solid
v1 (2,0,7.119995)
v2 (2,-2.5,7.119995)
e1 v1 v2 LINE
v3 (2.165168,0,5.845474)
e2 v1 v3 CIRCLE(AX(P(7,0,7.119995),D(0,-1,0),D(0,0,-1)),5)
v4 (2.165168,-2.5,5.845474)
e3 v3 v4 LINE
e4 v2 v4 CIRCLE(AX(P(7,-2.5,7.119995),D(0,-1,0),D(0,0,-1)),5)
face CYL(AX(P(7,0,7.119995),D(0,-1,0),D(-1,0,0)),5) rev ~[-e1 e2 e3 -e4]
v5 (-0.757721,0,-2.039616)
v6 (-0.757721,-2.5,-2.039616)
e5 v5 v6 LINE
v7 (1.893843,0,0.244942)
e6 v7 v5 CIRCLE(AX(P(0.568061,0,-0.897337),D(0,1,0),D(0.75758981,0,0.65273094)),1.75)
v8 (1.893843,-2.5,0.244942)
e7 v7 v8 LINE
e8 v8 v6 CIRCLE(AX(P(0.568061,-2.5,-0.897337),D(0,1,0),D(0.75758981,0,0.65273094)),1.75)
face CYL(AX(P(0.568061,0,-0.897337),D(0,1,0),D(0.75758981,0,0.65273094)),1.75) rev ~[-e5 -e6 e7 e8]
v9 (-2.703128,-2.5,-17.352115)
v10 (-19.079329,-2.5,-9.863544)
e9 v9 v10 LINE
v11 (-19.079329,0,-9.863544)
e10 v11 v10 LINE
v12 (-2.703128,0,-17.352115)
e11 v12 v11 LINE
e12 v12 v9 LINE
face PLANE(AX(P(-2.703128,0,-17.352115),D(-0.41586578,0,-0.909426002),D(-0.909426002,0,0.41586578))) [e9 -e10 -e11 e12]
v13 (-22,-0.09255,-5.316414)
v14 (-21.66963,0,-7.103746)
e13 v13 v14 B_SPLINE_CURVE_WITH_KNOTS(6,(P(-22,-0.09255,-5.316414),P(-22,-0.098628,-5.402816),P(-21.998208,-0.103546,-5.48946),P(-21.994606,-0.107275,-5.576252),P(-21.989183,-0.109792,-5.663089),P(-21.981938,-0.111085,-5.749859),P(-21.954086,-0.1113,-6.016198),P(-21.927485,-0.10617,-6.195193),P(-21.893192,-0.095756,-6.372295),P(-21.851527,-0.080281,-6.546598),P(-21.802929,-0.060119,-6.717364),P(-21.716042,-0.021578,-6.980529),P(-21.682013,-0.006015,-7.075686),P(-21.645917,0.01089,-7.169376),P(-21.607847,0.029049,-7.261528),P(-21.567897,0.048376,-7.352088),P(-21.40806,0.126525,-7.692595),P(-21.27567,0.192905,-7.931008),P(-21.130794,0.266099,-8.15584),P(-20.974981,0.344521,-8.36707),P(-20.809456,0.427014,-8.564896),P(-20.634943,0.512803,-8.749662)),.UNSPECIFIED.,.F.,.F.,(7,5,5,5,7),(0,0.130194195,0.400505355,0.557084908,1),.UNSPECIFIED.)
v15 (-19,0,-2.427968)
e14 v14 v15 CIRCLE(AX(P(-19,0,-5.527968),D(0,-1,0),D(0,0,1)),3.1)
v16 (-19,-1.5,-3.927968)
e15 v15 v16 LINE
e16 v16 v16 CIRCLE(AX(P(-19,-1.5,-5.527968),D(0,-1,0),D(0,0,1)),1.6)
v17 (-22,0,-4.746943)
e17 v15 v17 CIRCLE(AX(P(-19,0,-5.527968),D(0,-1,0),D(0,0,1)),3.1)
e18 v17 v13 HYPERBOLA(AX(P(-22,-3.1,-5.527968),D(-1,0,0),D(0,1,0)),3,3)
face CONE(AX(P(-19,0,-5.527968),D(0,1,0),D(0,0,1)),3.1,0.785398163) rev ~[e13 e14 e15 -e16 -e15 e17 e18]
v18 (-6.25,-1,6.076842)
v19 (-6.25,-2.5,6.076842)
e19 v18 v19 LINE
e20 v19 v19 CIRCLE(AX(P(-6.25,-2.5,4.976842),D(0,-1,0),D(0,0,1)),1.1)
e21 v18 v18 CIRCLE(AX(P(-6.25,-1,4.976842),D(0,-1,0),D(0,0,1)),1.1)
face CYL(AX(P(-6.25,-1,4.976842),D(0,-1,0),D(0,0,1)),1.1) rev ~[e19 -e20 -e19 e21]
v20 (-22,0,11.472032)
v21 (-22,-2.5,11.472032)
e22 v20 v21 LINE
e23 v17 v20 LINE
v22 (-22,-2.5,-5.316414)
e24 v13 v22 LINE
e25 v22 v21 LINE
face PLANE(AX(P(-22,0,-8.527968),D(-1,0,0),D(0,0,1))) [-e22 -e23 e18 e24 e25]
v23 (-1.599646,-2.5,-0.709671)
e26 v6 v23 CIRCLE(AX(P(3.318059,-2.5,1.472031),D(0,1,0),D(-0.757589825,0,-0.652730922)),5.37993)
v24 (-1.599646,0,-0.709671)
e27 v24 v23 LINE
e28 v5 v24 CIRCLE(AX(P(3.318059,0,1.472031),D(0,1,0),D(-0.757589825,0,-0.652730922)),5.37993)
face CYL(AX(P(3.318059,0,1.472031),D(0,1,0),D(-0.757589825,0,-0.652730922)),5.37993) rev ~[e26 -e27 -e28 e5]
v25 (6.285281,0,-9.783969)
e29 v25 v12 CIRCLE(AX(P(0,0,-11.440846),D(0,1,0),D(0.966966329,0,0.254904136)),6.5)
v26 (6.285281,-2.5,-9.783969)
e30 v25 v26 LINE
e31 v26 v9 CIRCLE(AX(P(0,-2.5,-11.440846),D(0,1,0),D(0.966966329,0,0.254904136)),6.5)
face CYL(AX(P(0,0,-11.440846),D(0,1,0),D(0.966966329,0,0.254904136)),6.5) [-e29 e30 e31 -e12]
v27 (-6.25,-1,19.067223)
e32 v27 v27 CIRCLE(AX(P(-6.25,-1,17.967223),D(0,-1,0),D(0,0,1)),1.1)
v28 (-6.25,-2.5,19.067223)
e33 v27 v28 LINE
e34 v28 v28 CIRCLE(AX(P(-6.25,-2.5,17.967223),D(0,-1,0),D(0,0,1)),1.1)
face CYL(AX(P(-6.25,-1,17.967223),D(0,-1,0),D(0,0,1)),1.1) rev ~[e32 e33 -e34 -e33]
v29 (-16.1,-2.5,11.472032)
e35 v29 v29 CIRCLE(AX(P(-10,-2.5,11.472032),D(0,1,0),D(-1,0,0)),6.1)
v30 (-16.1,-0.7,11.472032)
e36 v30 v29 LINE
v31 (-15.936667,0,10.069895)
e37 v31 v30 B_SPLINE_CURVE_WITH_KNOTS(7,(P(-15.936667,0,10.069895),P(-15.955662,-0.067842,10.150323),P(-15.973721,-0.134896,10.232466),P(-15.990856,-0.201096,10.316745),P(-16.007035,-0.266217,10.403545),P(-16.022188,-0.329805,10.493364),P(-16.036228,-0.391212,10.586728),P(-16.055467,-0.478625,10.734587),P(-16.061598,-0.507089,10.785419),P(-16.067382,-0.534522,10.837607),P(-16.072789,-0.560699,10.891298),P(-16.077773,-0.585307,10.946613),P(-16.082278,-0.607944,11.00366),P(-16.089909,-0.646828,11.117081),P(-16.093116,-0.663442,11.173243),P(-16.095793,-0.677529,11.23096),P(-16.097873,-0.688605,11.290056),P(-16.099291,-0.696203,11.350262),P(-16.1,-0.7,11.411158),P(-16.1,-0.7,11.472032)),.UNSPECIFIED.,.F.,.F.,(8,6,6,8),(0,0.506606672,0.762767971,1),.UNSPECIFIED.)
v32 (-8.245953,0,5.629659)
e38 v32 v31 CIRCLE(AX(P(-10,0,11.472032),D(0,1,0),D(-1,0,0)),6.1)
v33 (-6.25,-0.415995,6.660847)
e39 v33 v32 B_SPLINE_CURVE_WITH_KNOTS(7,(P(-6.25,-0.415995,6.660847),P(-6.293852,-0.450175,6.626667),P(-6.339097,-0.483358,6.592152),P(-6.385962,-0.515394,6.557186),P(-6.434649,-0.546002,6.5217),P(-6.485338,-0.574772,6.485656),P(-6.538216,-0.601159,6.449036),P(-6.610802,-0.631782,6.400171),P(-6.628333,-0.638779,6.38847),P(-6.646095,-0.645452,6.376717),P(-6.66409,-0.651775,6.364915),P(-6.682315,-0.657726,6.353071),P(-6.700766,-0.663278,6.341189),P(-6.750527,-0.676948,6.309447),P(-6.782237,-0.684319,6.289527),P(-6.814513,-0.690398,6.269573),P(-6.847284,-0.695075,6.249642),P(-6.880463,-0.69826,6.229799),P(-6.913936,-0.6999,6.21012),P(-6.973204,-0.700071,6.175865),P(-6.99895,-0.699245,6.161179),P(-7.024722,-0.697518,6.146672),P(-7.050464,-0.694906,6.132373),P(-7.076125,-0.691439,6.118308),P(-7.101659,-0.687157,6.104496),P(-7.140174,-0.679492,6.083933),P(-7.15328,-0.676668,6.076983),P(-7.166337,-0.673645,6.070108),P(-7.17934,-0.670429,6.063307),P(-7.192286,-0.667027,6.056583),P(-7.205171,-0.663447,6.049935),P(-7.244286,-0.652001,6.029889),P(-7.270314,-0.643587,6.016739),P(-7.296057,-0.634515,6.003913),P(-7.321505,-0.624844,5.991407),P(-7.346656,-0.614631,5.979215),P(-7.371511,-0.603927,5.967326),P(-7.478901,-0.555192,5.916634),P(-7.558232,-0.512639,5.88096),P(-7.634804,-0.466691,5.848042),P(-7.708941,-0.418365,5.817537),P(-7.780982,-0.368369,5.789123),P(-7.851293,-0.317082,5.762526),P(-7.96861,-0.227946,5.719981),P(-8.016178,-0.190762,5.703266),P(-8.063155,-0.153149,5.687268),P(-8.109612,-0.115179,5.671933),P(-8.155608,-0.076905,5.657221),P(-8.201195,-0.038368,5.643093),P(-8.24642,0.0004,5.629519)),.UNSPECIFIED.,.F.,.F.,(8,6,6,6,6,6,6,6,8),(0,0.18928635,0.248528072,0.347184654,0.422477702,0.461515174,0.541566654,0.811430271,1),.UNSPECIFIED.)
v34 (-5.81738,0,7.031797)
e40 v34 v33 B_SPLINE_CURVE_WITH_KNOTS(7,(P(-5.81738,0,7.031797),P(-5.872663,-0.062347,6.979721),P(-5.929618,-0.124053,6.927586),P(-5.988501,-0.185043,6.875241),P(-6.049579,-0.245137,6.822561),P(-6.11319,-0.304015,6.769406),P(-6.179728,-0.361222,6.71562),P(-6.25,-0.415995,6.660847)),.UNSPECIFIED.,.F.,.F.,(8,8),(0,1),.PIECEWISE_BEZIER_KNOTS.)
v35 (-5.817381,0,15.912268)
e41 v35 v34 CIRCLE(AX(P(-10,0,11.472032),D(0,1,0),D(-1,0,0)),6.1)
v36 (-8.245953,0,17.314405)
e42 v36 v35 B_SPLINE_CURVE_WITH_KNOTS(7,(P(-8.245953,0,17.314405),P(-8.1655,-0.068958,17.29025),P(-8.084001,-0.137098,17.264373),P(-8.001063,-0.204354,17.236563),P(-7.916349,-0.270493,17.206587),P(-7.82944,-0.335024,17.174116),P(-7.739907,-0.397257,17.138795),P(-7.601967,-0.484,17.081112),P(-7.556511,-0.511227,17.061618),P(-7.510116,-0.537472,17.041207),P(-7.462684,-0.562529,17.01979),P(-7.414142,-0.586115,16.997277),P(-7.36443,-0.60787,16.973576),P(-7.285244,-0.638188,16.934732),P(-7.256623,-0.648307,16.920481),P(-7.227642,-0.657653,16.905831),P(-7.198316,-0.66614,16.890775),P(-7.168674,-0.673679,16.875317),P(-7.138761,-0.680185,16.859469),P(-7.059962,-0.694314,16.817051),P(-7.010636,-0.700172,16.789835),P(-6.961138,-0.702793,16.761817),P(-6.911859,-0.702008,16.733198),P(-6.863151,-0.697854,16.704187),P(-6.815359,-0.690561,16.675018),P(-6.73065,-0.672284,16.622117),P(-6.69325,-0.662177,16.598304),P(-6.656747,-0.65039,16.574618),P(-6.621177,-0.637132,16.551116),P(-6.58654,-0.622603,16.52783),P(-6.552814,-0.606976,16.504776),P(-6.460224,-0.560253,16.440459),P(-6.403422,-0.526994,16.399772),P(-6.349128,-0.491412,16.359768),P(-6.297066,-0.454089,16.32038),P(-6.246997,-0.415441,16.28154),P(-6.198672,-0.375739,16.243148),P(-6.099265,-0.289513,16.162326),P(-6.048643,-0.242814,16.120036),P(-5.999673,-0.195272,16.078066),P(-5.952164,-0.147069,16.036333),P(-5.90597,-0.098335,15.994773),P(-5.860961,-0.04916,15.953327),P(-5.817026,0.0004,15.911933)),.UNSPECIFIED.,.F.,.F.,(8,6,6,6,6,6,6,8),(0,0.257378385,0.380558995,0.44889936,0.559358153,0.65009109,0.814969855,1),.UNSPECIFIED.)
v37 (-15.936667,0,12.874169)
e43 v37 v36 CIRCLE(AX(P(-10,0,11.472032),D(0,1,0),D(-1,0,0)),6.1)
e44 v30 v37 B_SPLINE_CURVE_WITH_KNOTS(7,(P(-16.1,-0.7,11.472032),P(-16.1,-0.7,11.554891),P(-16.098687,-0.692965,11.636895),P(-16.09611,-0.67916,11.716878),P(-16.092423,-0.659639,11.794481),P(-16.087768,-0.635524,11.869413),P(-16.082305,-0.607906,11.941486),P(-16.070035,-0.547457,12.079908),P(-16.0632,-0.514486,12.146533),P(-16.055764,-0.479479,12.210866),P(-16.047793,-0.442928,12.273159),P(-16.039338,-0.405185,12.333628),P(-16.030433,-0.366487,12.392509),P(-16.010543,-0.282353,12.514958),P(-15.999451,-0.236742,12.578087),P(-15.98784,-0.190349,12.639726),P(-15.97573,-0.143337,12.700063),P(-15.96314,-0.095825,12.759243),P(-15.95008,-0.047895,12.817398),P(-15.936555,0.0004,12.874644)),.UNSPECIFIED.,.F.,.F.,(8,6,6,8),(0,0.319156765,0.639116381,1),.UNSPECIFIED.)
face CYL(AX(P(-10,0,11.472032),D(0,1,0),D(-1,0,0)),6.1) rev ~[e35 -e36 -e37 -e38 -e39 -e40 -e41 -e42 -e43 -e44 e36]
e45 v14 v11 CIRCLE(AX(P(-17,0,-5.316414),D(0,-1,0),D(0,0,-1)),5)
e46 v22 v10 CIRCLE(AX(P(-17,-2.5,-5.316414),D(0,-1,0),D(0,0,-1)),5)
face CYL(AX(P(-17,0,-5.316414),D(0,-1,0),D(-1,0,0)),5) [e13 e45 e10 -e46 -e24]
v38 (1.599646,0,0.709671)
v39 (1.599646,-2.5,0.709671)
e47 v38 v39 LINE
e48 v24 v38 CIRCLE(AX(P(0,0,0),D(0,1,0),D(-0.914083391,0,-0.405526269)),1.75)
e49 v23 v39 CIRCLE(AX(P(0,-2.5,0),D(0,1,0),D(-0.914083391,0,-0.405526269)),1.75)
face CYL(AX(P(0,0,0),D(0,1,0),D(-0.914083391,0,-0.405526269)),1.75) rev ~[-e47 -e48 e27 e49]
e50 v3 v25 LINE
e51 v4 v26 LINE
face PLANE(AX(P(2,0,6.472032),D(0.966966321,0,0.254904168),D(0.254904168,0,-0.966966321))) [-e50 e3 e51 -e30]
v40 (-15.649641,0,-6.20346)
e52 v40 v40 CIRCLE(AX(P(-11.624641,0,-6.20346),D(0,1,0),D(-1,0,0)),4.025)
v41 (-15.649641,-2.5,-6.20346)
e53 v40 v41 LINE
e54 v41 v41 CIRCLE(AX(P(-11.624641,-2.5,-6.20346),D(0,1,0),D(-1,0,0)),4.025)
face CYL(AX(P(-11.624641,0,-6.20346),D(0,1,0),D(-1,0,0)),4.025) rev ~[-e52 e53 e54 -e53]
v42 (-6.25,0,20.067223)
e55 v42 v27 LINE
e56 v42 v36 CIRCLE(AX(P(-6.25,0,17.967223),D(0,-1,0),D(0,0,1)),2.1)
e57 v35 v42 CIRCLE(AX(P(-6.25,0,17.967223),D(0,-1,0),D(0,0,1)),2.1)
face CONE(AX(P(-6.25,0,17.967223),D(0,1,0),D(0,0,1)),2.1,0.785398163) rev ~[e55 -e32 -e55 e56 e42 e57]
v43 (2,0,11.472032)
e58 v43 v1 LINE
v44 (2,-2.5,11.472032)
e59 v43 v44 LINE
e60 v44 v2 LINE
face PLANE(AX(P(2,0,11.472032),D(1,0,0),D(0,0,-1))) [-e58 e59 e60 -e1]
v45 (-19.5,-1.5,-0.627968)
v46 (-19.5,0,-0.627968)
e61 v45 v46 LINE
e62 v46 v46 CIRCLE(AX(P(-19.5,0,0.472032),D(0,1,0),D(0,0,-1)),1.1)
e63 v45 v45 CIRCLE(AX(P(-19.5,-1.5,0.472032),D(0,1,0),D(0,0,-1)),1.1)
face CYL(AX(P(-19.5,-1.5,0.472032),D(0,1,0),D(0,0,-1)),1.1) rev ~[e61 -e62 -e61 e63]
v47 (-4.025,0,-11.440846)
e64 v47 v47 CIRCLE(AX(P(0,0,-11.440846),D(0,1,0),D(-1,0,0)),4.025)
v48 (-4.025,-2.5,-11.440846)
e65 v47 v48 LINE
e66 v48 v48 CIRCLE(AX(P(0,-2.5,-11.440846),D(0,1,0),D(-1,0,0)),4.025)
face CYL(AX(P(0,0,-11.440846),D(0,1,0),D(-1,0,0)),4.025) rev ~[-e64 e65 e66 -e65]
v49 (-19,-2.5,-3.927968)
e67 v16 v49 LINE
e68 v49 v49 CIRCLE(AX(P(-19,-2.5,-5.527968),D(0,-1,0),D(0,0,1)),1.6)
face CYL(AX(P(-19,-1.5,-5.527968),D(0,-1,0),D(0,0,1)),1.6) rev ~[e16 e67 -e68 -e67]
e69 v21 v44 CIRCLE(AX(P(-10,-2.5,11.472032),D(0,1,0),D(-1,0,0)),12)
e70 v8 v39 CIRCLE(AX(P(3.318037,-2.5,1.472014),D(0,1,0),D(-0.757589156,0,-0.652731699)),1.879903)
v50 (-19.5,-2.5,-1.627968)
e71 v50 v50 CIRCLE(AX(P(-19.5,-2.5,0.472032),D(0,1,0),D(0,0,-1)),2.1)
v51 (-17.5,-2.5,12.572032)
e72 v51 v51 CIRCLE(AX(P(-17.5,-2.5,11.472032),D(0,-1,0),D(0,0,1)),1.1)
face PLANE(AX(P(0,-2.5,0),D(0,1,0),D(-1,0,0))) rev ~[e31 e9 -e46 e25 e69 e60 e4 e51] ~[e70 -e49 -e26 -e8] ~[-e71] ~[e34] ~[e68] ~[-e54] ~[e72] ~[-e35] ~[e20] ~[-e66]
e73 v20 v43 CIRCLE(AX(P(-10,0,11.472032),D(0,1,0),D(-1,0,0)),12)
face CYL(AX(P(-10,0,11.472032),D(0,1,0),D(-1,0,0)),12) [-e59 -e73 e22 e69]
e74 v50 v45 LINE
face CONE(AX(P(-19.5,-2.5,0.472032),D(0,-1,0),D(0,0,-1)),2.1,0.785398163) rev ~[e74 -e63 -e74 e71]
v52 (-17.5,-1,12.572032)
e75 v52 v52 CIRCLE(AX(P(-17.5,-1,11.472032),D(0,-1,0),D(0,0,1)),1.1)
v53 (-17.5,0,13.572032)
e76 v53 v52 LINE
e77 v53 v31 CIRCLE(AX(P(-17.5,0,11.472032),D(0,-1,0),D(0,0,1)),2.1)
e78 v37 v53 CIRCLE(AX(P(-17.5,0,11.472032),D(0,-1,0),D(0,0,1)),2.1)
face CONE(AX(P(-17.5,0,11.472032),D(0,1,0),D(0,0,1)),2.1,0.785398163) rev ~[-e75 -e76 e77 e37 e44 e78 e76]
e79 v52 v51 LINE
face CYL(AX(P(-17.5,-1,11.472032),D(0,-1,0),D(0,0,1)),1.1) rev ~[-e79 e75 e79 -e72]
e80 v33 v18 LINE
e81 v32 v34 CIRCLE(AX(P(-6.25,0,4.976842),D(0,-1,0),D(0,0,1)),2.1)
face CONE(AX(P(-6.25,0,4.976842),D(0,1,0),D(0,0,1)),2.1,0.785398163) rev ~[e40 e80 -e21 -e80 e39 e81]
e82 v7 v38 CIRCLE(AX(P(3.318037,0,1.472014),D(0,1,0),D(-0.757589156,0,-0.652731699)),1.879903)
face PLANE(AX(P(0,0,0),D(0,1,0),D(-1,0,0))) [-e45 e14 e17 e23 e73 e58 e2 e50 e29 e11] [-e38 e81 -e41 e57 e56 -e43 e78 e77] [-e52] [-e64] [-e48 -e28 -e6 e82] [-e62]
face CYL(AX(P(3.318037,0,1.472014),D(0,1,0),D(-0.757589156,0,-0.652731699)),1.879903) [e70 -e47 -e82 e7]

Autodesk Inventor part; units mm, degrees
ref_plane "YZ Plane" through (0, 0, 0) normal (1, 0, 0) x (0, 1, 0)
ref_plane "XZ Plane" through (0, 0, 0) normal (0, 1, 0) x (-1, 0, 0)
ref_plane "XY Plane" through (0, 0, 0) normal (0, 0, 1) x (1, 0, 0)
sketch "Sketch1" plane through (0, 0, 0) normal (0, 1, 0) x (-1, 0, 0)
  circle A0 centre (0, 0) radius 1.75 construction
  circle A1 centre (10, 11.472032) radius 12
  line L0 (0, 0) -> (10, 11.472032) construction
  line L1 (0, 0) -> (4, 0) construction
  circle A2 centre (0, 0) radius 4 construction
  circle A3 centre (0, -11.440846) radius 6.5
  line L2 (10, 11.472032) -> (0, -11.440846) construction
  line L3 (0, 0) -> (0, -11.440846) construction
  line L4 (0, 0) -> (0, -4) construction
  line L5 (22, 11.472032) -> (22, -8.527968)
  line L6 (22, -8.527968) -> (2.703128, -17.352115)
  line L7 (-2, 11.472032) -> (-2, 6.472032)
  line L8 (-2, 6.472032) -> (-6.285281, -9.783969)
  circle A4 centre (10, 11.472032) radius 9.55
  line L9 (10, 11.472032) -> (17.5, 11.472032) construction
  circle A5 centre (17.5, 11.472032) radius 1.1
  circle A6 centre (6.25, 17.967223) radius 1.1
  circle A7 centre (6.25, 4.976842) radius 1.1
  circle A8 centre (10, 11.472032) radius 6.1
  circle A9 centre (0, -11.440846) radius 4.025
  circle A10 centre (10, 11.472032) radius 10
  circle A11 centre (0, -11.440846) radius 5
  circle A12 centre (11.624641, -6.20346) radius 7.75
  circle A13 centre (11.624641, -6.20346) radius 4.025
  circle A14 centre (19, -5.527968) radius 1.6
  circle A15 centre (19.5, 0.472032) radius 1.35
  circle A16 centre (0, -11.440846) radius 5.5
  circle A17 centre (10, 11.472032) radius 10.5
  dimension "d5" = 8
  dimension "d0" = 3.5
  dimension "d1" = 24
  dimension "d2" = 4
  dimension "d4" = 10
  dimension "d6" = 13
  dimension "d7" = 25
  dimension "d8" = 17.5
  dimension "d12" = 0
  dimension "d13" = 20
  dimension "d14" = 5
  dimension "d17" = 19.1
  dimension "d19" = 7.5
  dimension "d20" = 2.2
  dimension "d23" = 360
  dimension "d25" = 12.2
  dimension "d26" = 8.05
  dimension "d38" = 20
  dimension "d39" = 10
  dimension "d40" = 15.5
  dimension "d41" = 8.05
  dimension "d42" = 3.2
  dimension "d43" = 3
  dimension "d44" = 3
  dimension "d53" = 2.5
  dimension "d54" = 9
  dimension "d56" = 2.7
  dimension "d67" = 11
  dimension "d69" = 21
sketch "Sketch1 outline for Extrusion1" plane through (0, 0, 0) normal (0, 1, 0) x (-1, 0, 0)
  circle A0 centre (10, 11.472032) radius 6.1
  line L0 (-2, 11.472032) -> (-2, 6.472032)
  line L1 (-2, 6.472032) -> (-6.285281, -9.783969)
  arc A1 (-6.285281, -9.783969) -> (2.703128, -17.352115) centre (0, -11.440846) ccw
  line L2 (2.703128, -17.352115) -> (22, -8.527968)
  line L3 (22, -8.527968) -> (22, 11.472032)
  arc A2 (22, 11.472032) -> (-2, 11.472032) centre (10, 11.472032) ccw
extrude "Extrusion1" add sketch "Sketch1 outline for Extrusion1" against normal blind 2.5
sketch "Sketch1 outline for Extrusion2" plane through (0, 0, 0) normal (0, 1, 0) x (-1, 0, 0)
  circle A0 centre (0, -11.440846) radius 4.025
  circle A1 centre (11.624641, -6.20346) radius 4.025
extrude "Extrusion2" cut sketch "Sketch1 outline for Extrusion2" against normal blind 2.5
hole "Hole1" at (-17.5, 0, 11.472032) at (-6.25, 0, 17.967223) at (-6.25, 0, 4.976842) direction (0, -1, 0) diameter 2.2 end through all countersink diameter 4.2 countersink angle 90
hole "Hole2" at (-19, 0, -5.527968) direction (0, -1, 0) diameter 3.2 end through all countersink diameter 6.2 countersink angle 90
fillet "Fillet1" radius 5 2 edges at (-22, -1.25, -8.528) (2, -1.25, 6.472)
sketch "Sketch3" plane through (0, -2.5, 0) normal (0, -1, 0) x (1, 0, 0)
  point P0 (0, 0)
  point P1 (-19.5, 0.472032)
hole "Hole3" at (-19.5, -2.5, 0.472032) direction (0, 1, 0) diameter 2.2 end through all countersink diameter 4.2 countersink angle 90
sketch "Sketch4" plane through (0, 0, 0) normal (0, 1, 0) x (1, 0, 0)
  circle A0 centre (0, 0) radius 1.75 construction
  circle A1 centre (0, 0) radius 4 construction
  line L0 (2, -1.472032) -> (3.318061, -1.472032) construction
  line L1 (6.285281, 9.783969) -> (2.165168, -5.845474)
  arc A2 (0.568061, 0.897337) -> (0, 0) centre (3.318061, -1.472032) ccw construction
  arc A3 (-0.757721, 2.039616) -> (-1.599646, 0.709671) centre (3.318061, -1.472032) ccw
  arc A4 (1.893843, -0.244942) -> (1.599646, -0.709671) centre (3.318061, -1.472032) ccw
  arc A5 (1.893843, -0.244942) -> (-0.757721, 2.039616) centre (0.568061, 0.897337) ccw
  arc A6 (-1.599646, 0.709671) -> (1.599646, -0.709671) centre (0, 0) ccw
  line L2 (2, -1.472032) -> (2, -6.472032) construction
  dimension "d74" = 2.75
  dimension "d80" = 5
extrude "Extrusion3" cut sketch "Sketch4" against normal blind 2.5
properties part number "Dribbler Bracket"
